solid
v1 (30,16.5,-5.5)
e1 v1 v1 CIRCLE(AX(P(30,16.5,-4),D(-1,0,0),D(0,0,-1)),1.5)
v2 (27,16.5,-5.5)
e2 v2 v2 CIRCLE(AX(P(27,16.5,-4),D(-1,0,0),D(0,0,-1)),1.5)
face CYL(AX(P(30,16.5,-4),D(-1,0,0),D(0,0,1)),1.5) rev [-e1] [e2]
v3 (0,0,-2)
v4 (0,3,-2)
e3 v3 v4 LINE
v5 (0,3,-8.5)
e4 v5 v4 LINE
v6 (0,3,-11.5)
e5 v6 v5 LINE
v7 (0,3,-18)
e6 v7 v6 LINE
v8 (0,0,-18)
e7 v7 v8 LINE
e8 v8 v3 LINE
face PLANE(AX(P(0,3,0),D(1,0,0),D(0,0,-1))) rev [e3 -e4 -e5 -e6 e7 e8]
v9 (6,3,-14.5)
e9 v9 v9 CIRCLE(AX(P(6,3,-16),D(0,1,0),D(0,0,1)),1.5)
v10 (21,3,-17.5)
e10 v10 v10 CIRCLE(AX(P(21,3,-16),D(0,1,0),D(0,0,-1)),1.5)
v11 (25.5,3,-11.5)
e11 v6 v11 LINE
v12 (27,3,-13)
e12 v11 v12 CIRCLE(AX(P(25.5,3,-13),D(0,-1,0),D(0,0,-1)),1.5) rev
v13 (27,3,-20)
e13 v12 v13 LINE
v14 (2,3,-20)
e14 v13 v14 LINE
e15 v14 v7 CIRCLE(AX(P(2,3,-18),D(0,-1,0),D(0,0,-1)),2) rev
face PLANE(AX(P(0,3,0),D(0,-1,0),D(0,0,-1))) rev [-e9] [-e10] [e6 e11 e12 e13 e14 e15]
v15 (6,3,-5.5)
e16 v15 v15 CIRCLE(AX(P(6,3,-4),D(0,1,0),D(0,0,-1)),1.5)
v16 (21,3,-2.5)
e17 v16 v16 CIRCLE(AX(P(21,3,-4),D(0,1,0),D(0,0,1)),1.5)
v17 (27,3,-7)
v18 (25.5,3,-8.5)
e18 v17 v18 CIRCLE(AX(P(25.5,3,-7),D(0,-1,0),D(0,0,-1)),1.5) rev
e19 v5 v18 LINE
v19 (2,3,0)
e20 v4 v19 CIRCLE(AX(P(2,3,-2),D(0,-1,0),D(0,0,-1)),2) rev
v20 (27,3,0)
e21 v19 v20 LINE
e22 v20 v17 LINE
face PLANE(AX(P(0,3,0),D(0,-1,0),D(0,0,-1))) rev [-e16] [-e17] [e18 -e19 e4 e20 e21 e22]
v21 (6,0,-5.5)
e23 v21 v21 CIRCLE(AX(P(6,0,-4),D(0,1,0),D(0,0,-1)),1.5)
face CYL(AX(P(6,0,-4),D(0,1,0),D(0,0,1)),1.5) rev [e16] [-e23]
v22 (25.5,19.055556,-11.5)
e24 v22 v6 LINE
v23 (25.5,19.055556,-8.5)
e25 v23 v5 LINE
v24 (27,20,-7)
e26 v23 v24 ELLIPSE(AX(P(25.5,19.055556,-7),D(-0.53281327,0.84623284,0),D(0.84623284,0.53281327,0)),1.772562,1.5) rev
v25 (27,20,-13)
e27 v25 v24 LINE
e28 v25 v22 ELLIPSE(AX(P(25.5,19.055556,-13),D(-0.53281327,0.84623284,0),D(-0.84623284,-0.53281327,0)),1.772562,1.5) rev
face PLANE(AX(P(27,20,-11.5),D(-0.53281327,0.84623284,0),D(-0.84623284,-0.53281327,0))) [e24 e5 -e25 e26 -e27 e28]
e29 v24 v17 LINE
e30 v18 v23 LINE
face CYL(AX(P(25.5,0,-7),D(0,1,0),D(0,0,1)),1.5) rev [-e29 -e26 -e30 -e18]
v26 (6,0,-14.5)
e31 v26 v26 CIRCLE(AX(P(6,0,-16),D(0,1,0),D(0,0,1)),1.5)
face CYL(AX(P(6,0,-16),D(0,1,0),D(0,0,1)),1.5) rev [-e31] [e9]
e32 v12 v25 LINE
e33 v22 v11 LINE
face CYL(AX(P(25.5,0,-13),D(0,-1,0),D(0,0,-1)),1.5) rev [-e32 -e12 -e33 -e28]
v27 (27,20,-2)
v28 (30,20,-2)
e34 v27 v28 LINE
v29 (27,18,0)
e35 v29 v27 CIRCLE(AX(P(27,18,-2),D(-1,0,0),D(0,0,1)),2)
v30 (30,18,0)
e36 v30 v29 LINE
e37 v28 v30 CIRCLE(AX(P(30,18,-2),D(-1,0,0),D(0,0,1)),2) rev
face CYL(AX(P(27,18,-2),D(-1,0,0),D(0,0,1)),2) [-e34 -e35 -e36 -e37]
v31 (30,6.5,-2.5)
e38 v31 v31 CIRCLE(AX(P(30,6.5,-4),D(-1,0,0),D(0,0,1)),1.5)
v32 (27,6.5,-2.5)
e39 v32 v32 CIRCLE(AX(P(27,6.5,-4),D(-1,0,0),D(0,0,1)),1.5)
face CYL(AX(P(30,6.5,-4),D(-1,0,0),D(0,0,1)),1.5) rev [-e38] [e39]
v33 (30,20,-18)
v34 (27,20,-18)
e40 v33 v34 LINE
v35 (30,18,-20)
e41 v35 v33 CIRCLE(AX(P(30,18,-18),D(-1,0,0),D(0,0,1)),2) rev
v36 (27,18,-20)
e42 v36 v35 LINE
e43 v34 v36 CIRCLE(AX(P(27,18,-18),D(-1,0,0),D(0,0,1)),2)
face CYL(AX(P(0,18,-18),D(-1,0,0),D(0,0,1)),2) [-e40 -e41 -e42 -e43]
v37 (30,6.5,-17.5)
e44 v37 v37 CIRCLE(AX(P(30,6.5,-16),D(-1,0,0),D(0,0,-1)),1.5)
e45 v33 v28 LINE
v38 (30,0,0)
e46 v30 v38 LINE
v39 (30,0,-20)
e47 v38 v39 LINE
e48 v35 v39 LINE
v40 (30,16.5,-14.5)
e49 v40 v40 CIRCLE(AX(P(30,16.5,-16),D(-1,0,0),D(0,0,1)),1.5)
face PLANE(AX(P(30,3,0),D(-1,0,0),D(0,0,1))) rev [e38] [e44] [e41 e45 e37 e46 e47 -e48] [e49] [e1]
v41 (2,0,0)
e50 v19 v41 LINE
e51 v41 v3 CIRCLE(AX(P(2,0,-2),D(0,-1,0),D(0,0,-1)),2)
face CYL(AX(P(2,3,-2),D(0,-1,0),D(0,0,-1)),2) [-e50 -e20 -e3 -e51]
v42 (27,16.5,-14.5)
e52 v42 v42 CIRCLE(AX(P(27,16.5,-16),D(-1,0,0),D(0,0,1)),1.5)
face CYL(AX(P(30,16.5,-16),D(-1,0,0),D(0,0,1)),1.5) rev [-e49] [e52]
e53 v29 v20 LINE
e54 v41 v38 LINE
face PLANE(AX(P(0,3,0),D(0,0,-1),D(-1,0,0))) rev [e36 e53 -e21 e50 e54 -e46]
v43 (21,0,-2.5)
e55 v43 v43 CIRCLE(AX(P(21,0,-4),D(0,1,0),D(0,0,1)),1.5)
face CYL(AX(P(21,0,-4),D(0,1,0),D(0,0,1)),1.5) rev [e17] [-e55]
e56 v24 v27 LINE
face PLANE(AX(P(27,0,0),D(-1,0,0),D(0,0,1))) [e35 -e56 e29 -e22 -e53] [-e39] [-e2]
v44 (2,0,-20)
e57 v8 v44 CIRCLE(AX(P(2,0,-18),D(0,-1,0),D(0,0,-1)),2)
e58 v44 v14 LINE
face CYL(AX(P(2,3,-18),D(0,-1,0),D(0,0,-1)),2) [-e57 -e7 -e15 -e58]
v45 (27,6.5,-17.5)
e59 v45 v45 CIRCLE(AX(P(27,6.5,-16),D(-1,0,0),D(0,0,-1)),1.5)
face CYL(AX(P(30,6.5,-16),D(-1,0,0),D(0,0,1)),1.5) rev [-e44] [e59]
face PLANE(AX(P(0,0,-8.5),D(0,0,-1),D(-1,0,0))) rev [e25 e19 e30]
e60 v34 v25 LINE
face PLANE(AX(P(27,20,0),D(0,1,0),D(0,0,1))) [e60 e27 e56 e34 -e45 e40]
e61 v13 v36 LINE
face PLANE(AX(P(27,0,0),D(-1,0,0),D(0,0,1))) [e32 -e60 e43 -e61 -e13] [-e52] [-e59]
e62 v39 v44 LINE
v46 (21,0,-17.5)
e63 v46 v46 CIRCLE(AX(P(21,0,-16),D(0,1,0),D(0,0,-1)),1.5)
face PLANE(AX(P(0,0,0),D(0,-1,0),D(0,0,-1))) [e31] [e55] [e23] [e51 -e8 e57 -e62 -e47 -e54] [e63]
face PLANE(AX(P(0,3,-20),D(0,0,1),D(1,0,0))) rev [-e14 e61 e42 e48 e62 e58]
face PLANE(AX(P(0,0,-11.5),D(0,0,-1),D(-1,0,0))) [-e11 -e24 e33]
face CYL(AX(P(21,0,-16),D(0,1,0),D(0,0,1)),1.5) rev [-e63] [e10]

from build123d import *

# Parameters (mm, degrees)
SKETCH_1_W           = 30
SKETCH_1_H           = 20
EXTRUDE_1_DEPTH      = 3
SKETCH_2_W           = 20
SKETCH_2_H           = 17
EXTRUDE_2_DEPTH      = 3
EXTRUDE_3_DEPTH      = 1.5
EXTRUDE_3_DEPTH_BACK = 1.5
SKETCH_4_R           = 1.5
CUT_EXTRUDE_1_DEPTH  = 40.862262856
SKETCH_5_R           = 1.5
CUT_EXTRUDE_2_DEPTH  = 40.102429592
FILLET_1_R           = 1.5
FILLET_2_R           = 2


with BuildPart() as part:
    # 草图1 → 凸台-拉伸1 (new body)
    with BuildSketch(Plane(origin=(0, 0, 0), x_dir=(1, 0, 0), z_dir=(0, 1, 0))):
        with Locations((15, 10)):
            Rectangle(SKETCH_1_W, SKETCH_1_H)
    extrude(amount=EXTRUDE_1_DEPTH)

    # 草图2 → 凸台-拉伸2 (add)
    with BuildSketch(Plane(origin=(30, 0, 0), x_dir=(0, 0, -1), z_dir=(1, 0, 0))):
        with Locations((10, 11.5)):
            Rectangle(SKETCH_2_W, SKETCH_2_H)
    extrude(amount=-EXTRUDE_2_DEPTH)

    # 草图3 → 凸台-拉伸3 (add, two sides: drawn at the far end of the back side and taken through both)
    with BuildSketch(Plane.XY.offset(-10).offset(-EXTRUDE_3_DEPTH_BACK)):
        Polygon((27, 20), (0, 3), (27, 3), align=None)
    extrude(amount=EXTRUDE_3_DEPTH + EXTRUDE_3_DEPTH_BACK)

    # 草图4 → 切除-拉伸1 (cut, through all)
    with BuildSketch(Plane(origin=(0, 3, 0), x_dir=(1, 0, 0), z_dir=(0, 1, 0))):
        with Locations(Location((6, 16, 0), (0, 0, 270))):
            Circle(SKETCH_4_R)
        with Locations(Location((21, 16, 0), (0, 0, 90))):
            Circle(SKETCH_4_R)
        with Locations(Location((21, 4, 0), (0, 0, 270))):
            Circle(SKETCH_4_R)
        with Locations(Location((6, 4, 0), (0, 0, 90))):
            Circle(SKETCH_4_R)
    extrude(amount=-CUT_EXTRUDE_1_DEPTH, mode=Mode.SUBTRACT)

    # 草图5 → 切除-拉伸2 (cut, through all)
    with BuildSketch(Plane.ZY.offset(-27)):
        with Locations((-16, 16.5)):
            Circle(SKETCH_5_R)
        with Locations(Location((-16, 6.5, 0), (0, 0, 180))):
            Circle(SKETCH_5_R)
        with Locations((-4, 6.5)):
            Circle(SKETCH_5_R)
        with Locations(Location((-4, 16.5, 0), (0, 0, 180))):
            Circle(SKETCH_5_R)
    extrude(amount=-CUT_EXTRUDE_2_DEPTH, mode=Mode.SUBTRACT)

    # 圆角1
    # the kernel refuses this fillet: 1.5 mm, written as the material it adds along each edge
    with BuildSketch(Plane(origin=(27, 3, -11.5), x_dir=(0, 0, -1), z_dir=(0, 1, 0))) as fillet_1_piece_1_section:
        with BuildLine():
            CenterArc((FILLET_1_R, FILLET_1_R), FILLET_1_R, 180, 90)
            Line((0, FILLET_1_R), (0, 0))
            Line((0, 0), (FILLET_1_R, 0))
        make_face()
    fillet_1_piece_1 = extrude(amount=20.75, mode=Mode.PRIVATE)
    fillet_1_piece_1 = split(fillet_1_piece_1, bisect_by=Plane(origin=(22.882537892, 17.407523858, -11.836797175), z_dir=(0.5328132696861393, -0.8462328400897506, 0)), keep=Keep.TOP, mode=Mode.PRIVATE)
    add(fillet_1_piece_1)
    with BuildSketch(Plane(origin=(27, -0.75, -8.5), x_dir=(0, 0, 1), z_dir=(0, 1, 0))) as fillet_1_piece_2_section:
        with BuildLine():
            CenterArc((FILLET_1_R, -FILLET_1_R), FILLET_1_R, 90, 90)
            Line((0, -FILLET_1_R), (0, 0))
            Line((0, 0), (FILLET_1_R, 0))
        make_face()
    fillet_1_piece_2 = extrude(amount=24.5, mode=Mode.PRIVATE)
    fillet_1_piece_2 = split(fillet_1_piece_2, bisect_by=Plane(origin=(26.667914796, 0, -8.163202825), z_dir=(0, 1, 0)), keep=Keep.TOP, mode=Mode.PRIVATE)
    fillet_1_piece_2 = split(fillet_1_piece_2, bisect_by=Plane(origin=(22.882537892, 17.407523858, -8.163202825), z_dir=(0.5328132696861393, -0.8462328400897506, 0)), keep=Keep.TOP, mode=Mode.PRIVATE)
    add(fillet_1_piece_2)

    # 圆角2
    fillet_2_edges = [part.edges().sort_by_distance(p)[0] for p in [
        (28.5, 20, 0),
        (28.5, 20, -20),
        (0, 1.5, -20),
        (0, 1.5, 0),
    ]]
    fillet(fillet_2_edges, radius=FILLET_2_R)


solid = part.part
